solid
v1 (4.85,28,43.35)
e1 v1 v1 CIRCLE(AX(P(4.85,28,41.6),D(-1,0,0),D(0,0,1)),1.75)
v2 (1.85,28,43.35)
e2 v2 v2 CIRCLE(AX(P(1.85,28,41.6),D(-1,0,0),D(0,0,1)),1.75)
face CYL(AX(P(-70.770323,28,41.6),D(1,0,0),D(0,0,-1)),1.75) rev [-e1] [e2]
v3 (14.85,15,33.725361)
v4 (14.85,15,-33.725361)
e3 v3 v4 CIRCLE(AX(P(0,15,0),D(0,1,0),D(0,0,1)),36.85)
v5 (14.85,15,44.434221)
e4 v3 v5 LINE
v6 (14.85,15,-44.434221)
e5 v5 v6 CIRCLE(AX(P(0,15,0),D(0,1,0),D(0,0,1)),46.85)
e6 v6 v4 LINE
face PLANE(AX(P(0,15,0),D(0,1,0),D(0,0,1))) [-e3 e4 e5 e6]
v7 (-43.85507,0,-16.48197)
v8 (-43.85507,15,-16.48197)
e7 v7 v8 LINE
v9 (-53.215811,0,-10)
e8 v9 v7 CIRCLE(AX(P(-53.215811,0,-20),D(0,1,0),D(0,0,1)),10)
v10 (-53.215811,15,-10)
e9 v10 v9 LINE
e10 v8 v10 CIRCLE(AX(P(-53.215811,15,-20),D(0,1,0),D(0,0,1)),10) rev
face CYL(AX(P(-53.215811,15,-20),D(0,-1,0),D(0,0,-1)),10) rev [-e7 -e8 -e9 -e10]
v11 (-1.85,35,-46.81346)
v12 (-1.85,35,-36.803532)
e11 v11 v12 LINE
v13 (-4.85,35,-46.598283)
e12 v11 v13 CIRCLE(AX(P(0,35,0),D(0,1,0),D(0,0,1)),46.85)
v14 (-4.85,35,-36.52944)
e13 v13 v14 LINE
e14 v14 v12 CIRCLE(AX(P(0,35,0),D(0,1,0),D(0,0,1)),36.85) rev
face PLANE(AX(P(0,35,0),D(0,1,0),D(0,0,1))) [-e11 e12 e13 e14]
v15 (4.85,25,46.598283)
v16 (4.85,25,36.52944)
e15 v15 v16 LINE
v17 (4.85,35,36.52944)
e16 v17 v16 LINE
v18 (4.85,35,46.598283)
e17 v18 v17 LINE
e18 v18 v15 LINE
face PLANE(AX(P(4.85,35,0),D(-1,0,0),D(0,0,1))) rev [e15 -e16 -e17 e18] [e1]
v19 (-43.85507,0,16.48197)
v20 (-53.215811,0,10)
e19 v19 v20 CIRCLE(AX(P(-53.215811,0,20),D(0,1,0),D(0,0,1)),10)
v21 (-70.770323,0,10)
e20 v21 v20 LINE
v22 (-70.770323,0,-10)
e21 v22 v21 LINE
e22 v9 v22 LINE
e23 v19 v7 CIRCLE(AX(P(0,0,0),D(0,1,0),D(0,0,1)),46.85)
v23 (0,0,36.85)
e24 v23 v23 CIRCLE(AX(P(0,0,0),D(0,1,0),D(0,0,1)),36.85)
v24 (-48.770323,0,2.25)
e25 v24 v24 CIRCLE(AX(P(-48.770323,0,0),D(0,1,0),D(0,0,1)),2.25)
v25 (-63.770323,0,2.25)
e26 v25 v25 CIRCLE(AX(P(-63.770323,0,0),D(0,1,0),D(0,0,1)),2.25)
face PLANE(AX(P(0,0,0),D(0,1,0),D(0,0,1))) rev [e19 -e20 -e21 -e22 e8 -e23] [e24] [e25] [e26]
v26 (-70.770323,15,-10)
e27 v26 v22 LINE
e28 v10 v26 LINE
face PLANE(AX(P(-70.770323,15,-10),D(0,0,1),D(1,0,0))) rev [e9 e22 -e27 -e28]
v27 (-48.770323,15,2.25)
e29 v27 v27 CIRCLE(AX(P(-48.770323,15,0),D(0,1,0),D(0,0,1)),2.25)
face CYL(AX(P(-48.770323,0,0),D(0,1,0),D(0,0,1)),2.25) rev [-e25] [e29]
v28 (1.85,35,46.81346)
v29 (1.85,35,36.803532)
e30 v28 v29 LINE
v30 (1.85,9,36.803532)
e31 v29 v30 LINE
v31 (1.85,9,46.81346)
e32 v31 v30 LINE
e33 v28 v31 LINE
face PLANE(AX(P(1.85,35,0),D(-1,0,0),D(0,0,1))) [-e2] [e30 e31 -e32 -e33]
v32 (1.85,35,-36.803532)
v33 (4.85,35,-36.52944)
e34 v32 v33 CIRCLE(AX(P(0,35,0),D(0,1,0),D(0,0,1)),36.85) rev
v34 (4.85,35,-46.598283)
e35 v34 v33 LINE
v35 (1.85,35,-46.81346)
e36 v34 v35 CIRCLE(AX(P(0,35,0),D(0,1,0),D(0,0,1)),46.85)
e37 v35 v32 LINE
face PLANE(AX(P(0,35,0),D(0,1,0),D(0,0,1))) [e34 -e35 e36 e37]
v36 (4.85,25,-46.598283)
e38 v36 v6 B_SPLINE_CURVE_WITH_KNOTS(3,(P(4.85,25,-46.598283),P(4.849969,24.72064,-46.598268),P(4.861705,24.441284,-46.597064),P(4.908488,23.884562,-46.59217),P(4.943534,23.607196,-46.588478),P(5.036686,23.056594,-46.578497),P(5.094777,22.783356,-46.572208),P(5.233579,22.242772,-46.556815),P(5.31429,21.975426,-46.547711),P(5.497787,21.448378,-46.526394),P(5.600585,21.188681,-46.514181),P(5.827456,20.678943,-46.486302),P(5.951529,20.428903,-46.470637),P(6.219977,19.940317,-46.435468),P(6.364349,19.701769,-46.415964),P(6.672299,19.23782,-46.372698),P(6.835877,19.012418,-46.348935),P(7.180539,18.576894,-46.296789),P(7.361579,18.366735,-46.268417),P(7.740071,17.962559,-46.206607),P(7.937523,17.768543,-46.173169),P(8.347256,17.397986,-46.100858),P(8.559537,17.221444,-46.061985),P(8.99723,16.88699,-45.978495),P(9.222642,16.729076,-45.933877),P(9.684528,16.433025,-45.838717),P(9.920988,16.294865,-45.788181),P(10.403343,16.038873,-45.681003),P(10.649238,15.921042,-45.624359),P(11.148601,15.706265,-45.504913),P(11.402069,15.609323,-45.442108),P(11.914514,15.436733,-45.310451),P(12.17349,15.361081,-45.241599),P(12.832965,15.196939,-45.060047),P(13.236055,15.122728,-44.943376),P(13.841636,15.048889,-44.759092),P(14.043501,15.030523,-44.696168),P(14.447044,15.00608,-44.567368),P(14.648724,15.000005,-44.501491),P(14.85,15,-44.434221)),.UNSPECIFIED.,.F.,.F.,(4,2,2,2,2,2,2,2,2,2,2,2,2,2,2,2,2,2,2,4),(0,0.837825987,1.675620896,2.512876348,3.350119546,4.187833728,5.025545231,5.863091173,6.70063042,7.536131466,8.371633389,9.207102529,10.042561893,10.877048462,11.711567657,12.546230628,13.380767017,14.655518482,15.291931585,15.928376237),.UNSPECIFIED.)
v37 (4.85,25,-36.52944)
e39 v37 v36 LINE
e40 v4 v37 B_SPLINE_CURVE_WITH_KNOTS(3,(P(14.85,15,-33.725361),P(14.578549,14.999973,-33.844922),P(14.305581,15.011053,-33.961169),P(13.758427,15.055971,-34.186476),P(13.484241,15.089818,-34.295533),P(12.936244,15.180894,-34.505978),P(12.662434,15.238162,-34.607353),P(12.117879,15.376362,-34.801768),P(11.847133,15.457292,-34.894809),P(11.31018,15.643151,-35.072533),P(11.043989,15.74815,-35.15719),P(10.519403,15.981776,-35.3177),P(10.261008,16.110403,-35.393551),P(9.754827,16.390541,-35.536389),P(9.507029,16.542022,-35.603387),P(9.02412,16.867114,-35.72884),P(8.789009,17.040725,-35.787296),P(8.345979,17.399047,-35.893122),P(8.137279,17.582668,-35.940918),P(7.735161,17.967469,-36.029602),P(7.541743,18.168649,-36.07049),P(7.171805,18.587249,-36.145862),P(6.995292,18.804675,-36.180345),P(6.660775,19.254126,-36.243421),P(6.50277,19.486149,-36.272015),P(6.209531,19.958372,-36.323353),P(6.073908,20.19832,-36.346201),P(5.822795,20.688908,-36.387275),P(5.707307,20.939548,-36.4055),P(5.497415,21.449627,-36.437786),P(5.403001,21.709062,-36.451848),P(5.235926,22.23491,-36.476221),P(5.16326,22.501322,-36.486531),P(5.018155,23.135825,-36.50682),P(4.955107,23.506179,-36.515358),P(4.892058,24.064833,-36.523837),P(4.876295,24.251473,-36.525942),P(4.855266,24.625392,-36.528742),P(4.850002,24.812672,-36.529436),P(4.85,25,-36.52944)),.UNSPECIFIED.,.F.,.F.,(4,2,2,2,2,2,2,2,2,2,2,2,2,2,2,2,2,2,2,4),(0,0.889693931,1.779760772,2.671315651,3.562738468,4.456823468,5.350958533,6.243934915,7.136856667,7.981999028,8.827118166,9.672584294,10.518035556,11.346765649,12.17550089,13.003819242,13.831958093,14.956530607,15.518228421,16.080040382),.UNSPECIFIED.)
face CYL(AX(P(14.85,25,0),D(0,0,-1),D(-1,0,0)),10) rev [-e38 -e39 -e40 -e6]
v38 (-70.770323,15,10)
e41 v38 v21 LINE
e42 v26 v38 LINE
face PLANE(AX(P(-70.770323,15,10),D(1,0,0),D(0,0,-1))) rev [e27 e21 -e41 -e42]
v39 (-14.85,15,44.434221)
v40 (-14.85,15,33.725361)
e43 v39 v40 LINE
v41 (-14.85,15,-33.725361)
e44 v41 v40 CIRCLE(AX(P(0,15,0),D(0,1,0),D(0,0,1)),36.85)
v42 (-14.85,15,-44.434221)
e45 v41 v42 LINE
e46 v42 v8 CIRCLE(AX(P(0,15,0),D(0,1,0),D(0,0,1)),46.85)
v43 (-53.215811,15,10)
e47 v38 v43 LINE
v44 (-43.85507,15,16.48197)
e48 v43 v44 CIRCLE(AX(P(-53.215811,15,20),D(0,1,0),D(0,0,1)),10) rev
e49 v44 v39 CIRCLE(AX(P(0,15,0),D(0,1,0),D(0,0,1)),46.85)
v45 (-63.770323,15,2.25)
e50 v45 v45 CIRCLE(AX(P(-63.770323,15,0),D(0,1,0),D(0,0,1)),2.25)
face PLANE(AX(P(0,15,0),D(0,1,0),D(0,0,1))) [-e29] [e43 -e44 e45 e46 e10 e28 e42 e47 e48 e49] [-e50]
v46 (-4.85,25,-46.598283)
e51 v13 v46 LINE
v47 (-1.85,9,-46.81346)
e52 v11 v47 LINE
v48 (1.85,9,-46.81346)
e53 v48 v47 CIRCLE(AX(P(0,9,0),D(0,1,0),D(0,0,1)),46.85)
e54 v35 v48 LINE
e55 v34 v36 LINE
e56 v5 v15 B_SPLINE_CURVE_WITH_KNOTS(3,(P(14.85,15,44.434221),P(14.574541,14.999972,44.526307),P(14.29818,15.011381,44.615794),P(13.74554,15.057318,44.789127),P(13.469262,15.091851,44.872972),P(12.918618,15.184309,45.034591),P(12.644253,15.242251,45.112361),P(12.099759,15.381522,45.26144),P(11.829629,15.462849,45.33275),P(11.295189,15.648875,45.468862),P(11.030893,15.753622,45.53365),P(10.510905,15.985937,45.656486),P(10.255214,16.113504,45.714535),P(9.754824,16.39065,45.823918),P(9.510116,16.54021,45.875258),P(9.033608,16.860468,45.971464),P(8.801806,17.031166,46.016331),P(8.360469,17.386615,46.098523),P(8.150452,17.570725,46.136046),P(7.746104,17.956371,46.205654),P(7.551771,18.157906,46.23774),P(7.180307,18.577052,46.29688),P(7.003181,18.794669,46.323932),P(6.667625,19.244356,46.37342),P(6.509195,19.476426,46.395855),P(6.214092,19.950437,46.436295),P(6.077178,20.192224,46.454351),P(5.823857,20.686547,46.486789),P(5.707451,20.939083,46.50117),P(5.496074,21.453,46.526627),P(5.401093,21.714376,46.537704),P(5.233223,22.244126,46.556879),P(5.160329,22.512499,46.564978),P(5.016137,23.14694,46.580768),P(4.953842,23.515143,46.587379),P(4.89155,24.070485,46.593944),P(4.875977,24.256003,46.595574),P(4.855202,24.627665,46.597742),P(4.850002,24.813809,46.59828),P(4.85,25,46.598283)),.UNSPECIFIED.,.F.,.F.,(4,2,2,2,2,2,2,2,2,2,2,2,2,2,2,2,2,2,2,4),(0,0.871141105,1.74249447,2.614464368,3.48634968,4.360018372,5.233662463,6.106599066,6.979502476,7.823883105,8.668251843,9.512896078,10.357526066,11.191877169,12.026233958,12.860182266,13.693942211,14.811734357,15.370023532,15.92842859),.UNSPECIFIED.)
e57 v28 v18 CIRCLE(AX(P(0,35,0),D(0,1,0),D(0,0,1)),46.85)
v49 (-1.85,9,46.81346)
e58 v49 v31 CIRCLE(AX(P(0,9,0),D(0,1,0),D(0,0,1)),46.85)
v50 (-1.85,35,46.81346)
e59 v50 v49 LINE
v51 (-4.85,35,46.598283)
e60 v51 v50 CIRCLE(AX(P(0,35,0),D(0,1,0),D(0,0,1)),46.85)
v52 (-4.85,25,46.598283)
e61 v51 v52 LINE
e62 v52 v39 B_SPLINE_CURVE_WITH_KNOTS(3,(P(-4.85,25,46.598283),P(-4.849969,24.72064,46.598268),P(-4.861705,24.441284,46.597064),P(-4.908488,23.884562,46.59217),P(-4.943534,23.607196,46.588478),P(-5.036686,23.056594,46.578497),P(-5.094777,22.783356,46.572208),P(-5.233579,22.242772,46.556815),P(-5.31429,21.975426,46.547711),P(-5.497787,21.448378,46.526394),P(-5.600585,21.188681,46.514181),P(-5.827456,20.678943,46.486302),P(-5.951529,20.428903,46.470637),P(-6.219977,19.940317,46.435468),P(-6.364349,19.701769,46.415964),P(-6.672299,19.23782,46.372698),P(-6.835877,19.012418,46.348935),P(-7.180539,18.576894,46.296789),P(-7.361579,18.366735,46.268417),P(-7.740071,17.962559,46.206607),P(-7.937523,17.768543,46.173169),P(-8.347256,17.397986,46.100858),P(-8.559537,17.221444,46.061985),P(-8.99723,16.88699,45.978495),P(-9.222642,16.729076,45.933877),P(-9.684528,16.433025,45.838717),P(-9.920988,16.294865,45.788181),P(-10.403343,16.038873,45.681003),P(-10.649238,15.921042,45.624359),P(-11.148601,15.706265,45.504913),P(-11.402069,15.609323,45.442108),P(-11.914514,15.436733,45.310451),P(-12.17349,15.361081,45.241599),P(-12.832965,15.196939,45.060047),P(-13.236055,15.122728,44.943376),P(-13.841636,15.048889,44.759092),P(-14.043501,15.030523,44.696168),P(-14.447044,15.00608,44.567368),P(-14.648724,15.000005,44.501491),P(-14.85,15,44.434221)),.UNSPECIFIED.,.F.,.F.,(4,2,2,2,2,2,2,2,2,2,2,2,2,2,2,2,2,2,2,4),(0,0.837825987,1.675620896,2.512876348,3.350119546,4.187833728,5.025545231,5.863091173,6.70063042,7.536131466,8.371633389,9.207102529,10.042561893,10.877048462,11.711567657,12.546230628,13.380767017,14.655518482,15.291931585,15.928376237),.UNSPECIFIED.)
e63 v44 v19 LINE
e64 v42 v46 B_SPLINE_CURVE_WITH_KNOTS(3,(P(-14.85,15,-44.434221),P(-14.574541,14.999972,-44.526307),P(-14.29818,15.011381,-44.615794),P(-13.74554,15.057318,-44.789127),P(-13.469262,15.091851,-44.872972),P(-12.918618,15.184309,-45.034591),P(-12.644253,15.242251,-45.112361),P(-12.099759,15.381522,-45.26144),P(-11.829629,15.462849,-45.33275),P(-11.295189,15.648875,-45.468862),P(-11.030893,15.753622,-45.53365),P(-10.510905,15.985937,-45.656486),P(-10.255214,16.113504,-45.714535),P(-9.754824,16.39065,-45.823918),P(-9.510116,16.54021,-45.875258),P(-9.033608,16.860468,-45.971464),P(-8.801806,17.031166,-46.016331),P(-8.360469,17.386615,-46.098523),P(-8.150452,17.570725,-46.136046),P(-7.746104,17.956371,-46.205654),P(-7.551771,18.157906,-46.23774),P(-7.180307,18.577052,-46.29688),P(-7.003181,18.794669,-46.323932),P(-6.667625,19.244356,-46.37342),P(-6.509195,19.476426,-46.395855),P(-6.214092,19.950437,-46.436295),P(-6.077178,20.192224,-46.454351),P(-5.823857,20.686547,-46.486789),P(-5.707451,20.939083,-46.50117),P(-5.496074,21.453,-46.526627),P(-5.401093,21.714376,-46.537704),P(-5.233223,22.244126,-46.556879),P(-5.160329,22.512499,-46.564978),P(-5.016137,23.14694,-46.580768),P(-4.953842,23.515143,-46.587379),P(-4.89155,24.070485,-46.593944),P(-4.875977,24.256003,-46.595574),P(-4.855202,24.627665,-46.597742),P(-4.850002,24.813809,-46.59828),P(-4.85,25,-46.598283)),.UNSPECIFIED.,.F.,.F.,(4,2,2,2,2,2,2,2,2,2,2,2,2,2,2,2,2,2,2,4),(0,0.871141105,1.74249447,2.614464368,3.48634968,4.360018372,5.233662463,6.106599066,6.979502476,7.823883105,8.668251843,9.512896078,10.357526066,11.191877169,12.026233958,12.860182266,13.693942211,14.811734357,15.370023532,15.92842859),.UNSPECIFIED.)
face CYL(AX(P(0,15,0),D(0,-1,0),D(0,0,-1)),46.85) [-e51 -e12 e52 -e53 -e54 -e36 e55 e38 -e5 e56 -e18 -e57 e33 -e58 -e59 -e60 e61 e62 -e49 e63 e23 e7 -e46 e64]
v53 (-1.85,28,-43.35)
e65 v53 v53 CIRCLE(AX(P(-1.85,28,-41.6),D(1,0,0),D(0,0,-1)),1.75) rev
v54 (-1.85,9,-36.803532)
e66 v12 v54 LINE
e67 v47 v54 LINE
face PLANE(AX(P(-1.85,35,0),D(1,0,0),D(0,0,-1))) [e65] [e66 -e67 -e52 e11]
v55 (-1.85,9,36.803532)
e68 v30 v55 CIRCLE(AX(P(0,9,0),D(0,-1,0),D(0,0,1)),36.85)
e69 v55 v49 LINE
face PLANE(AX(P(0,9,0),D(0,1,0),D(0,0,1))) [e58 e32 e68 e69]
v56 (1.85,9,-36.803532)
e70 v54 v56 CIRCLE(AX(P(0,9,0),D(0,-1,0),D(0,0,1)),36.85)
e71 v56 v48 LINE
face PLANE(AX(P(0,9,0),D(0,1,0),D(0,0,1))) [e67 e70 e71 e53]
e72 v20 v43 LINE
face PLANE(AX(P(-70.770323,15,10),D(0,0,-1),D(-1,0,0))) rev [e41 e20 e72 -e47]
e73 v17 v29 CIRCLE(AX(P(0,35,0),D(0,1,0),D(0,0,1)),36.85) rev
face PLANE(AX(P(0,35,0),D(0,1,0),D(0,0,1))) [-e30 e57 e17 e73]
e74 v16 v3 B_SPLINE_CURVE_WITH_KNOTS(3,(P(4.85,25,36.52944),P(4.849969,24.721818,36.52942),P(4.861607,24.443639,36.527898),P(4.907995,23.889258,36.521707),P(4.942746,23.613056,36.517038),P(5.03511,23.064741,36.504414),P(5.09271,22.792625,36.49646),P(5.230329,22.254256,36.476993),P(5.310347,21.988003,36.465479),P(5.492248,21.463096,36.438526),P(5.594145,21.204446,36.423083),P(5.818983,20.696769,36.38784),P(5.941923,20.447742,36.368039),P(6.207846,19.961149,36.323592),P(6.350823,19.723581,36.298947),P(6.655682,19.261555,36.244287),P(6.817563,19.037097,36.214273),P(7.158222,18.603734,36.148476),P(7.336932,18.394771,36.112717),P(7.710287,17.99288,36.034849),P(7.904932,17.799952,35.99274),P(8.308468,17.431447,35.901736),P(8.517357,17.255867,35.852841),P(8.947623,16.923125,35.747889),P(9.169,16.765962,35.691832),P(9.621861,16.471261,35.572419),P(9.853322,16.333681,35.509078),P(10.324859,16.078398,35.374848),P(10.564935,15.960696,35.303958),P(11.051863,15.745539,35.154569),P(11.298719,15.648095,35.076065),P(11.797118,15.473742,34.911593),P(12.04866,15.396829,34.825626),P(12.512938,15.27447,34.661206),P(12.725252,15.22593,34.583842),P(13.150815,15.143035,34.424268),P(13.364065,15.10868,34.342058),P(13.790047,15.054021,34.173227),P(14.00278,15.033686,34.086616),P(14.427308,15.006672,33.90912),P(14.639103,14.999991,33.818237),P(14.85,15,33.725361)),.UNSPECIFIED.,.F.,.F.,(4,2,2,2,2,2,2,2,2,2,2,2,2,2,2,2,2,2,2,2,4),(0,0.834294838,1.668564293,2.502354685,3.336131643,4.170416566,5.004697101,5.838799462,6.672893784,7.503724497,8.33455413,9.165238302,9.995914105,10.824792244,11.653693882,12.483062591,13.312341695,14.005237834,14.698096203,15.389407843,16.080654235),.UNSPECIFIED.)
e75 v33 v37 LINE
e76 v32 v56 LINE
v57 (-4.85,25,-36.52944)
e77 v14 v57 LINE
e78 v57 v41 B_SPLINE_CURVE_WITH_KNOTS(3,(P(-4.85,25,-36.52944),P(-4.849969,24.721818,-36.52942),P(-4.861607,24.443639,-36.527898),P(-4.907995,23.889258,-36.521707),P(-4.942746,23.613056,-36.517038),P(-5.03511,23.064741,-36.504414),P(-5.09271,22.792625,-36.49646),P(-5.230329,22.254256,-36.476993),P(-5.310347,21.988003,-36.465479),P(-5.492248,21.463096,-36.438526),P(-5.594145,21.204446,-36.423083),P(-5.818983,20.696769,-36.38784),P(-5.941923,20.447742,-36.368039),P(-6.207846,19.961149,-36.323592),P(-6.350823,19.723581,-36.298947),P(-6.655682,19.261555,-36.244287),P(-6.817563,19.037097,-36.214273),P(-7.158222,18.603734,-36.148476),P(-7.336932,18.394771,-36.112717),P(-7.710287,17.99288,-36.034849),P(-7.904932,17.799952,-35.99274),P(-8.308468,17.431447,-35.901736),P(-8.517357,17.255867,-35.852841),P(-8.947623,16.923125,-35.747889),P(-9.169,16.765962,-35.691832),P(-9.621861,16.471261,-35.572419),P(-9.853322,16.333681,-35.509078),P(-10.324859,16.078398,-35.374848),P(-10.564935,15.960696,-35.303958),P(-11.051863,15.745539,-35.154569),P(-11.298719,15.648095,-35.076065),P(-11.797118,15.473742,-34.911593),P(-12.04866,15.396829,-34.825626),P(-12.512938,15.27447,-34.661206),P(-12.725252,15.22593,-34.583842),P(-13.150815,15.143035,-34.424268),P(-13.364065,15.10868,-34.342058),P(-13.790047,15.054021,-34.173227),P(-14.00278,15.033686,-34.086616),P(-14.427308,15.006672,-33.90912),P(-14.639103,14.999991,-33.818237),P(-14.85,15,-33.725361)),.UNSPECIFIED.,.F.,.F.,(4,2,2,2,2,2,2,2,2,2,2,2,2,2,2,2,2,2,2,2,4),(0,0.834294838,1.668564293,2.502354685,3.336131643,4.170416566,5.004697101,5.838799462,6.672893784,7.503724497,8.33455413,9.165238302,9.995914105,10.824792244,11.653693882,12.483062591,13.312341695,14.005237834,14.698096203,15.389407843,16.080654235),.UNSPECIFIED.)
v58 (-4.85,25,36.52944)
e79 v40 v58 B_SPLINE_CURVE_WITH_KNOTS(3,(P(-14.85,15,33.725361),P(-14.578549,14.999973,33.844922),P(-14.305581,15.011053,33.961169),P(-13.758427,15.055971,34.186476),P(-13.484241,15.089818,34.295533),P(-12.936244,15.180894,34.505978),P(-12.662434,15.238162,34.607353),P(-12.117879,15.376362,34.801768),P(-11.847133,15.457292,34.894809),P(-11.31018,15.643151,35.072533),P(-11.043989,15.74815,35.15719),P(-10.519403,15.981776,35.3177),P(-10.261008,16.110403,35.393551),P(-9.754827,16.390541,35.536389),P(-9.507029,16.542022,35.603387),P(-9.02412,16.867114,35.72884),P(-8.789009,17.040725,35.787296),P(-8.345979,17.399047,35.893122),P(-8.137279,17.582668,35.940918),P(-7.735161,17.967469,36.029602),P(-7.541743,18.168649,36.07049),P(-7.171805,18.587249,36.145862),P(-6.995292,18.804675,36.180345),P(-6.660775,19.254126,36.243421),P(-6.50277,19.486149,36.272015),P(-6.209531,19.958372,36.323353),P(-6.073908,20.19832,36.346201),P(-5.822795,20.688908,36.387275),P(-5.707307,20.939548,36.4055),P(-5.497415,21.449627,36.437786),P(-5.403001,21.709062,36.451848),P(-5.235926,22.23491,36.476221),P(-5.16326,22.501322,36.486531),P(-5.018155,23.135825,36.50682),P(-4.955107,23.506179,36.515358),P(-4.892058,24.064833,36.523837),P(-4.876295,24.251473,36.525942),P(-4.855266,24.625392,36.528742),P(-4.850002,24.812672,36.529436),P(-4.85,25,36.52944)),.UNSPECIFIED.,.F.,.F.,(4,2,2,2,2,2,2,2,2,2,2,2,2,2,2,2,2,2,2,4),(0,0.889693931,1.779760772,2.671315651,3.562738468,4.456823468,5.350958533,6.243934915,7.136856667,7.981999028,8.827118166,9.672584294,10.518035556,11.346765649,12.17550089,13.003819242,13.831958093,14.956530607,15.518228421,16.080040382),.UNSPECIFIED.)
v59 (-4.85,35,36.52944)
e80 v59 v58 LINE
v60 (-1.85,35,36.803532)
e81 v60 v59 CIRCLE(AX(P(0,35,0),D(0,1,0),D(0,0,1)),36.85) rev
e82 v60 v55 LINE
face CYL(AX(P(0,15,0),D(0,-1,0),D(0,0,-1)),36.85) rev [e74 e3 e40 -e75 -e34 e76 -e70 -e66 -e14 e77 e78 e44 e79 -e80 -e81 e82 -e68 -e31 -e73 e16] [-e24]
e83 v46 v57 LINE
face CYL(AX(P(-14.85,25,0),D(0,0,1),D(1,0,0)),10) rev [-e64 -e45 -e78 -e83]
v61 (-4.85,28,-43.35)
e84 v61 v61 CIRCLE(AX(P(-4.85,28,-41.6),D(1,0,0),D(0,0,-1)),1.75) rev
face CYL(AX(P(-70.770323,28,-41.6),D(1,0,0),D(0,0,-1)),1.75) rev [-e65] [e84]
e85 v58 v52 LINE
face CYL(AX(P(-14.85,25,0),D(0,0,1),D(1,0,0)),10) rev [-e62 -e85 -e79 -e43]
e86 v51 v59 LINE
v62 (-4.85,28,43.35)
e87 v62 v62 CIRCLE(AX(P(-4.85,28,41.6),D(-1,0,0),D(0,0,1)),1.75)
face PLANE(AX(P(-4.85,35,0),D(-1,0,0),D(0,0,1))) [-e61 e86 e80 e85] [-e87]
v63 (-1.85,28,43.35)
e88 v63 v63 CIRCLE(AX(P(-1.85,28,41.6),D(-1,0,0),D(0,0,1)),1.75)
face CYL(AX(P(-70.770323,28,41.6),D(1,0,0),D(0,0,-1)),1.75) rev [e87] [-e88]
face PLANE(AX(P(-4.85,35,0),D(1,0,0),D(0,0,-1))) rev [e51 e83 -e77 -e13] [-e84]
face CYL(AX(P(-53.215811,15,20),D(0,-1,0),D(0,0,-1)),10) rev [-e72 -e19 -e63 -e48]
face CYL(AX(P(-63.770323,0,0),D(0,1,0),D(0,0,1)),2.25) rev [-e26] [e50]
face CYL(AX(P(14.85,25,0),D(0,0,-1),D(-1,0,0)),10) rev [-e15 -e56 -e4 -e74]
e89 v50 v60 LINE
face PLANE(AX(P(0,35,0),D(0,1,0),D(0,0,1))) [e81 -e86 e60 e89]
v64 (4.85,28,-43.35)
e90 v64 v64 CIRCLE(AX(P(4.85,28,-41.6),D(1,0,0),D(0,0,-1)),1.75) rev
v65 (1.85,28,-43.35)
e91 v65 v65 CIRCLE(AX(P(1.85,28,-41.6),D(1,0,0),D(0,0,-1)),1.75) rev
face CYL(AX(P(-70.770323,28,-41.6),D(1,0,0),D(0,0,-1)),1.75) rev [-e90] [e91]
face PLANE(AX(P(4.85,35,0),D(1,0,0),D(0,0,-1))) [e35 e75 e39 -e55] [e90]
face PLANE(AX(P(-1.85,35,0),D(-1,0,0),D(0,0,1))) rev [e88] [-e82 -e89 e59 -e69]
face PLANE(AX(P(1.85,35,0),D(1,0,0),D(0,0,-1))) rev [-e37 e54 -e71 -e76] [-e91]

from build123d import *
from build123d.topology import SkipClean

# Parameters (mm, degrees)
SKETCH1_R           = 36.85
BOSS_EXTRUDE1_DEPTH = 15
SKETCH2_R           = 2.25
CUT_EXTRUDE1_DEPTH  = 87.187940965
BOSS_EXTRUDE2_DEPTH = 20
FILLET1_R           = 10
CUT_EXTRUDE2_START  = -6
CUT_EXTRUDE2_DEPTH  = 6
SKETCH5_R           = 1.75
CUT_EXTRUDE3_DEPTH  = 92.806106375
FILLET2_R           = 10


with BuildPart() as part:
    # Sketch1 → Boss-Extrude1 (new body)
    with BuildSketch(Plane(origin=(0, 0, 0), x_dir=(1, 0, 0), z_dir=(0, 1, 0))):
        with BuildLine():
            Line((-70.770323355, -10), (-45.770323355, -10))
            ThreePointArc((-45.770323355, -10), (46.85, 0), (-45.770323355, 10))
            Line((-45.770323355, 10), (-70.770323355, 10))
            Line((-70.770323355, 10), (-70.770323355, -10))
        make_face()
        with Locations(Location((0, 0, 0), (0, 0, 270))):
            Circle(SKETCH1_R, mode=Mode.SUBTRACT)
    extrude(amount=BOSS_EXTRUDE1_DEPTH)

    # Sketch2 → Cut-Extrude1 (cut, through all)
    with BuildSketch(Plane(origin=(0, 15, 0), x_dir=(1, 0, 0), z_dir=(0, 1, 0))):
        with Locations(Location((-63.770323355, 0, 0), (0, 0, 270))):
            Circle(SKETCH2_R)
        with Locations(Location((-48.770323355, 0, 0), (0, 0, 270))):
            Circle(SKETCH2_R)
    extrude(amount=-CUT_EXTRUDE1_DEPTH, mode=Mode.SUBTRACT)

    # Sketch3 → Boss-Extrude2 (add)
    with SkipClean():  # the faces are left unmerged after this step: merging them gives an invalid solid
        with BuildSketch(Plane(origin=(0, 15, 0), x_dir=(1, 0, 0), z_dir=(0, 1, 0))):
            with BuildLine():
                ThreePointArc((-1.85, -36.803532439), (-3.352802058, -36.697155453), (-4.85, -36.529440182))
                Line((-4.85, -36.529440182), (-4.85, -46.59828323))
                ThreePointArc((-4.85, -46.59828323), (-3.351727199, -46.729952116), (-1.85, -46.813459603))
                Line((-1.85, -46.813459603), (-1.85, -36.803532439))
            make_face()
            with BuildLine():
                ThreePointArc((1.85, -46.813459603), (3.351727199, -46.729952116), (4.85, -46.59828323))
                Line((4.85, -46.59828323), (4.85, -36.529440182))
                ThreePointArc((4.85, -36.529440182), (3.352802058, -36.697155453), (1.85, -36.803532439))
                Line((1.85, -36.803532439), (1.85, -46.813459603))
            make_face()
            with BuildLine():
                ThreePointArc((4.85, 46.59828323), (3.351727199, 46.729952116), (1.85, 46.813459603))
                Line((1.85, 46.813459603), (1.85, 36.803532439))
                ThreePointArc((1.85, 36.803532439), (3.352802058, 36.697155453), (4.85, 36.529440182))
                Line((4.85, 36.529440182), (4.85, 46.59828323))
            make_face()
            with BuildLine():
                Line((-1.85, 36.803532439), (-1.85, 46.813459603))
                ThreePointArc((-1.85, 46.813459603), (-3.351727199, 46.729952116), (-4.85, 46.59828323))
                Line((-4.85, 46.59828323), (-4.85, 36.529440182))
                ThreePointArc((-4.85, 36.529440182), (-3.352802058, 36.697155453), (-1.85, 36.803532439))
            make_face()
        extrude(amount=BOSS_EXTRUDE2_DEPTH)

    # Fillet1
    # the kernel refuses this fillet: 10 mm, written as the material it adds along each edge
    with BuildSketch(Plane(origin=(-4.85, 15, 11.529440182), x_dir=(-1, 0, 0), z_dir=(0, 0, 1))) as fillet1_piece_1_section:
        with BuildLine():
            CenterArc((FILLET1_R, -FILLET1_R), FILLET1_R, 90, 90)
            Line((0, -FILLET1_R), (0, 0))
            Line((0, 0), (FILLET1_R, 0))
        make_face()
    fillet1_piece_1 = extrude(amount=60.068843048, mode=Mode.PRIVATE)
    fillet1_piece_1 = fillet1_piece_1 & Plane(origin=(0, 17.250913244, 0), x_dir=(-0.9769546073589704, 0, 0.2134471718249741), z_dir=(0, -1, 0)) * Cylinder(46.85, 161, mode=Mode.PRIVATE)
    fillet1_piece_1 = fillet1_piece_1 - Plane(origin=(0, 17.250913244, 0), x_dir=(0, 0, 1), z_dir=(0, -1, 0)) * Cylinder(36.85, 161, mode=Mode.PRIVATE)
    with BuildSketch(Plane(origin=(4.85, 15, 71.59828323), x_dir=(1, 0, 0), z_dir=(0, 0, -1))) as fillet1_piece_2_section:
        with BuildLine():
            CenterArc((FILLET1_R, -FILLET1_R), FILLET1_R, 90, 90)
            Line((0, -FILLET1_R), (0, 0))
            Line((0, 0), (FILLET1_R, 0))
        make_face()
    fillet1_piece_2 = extrude(amount=60.068843048, mode=Mode.PRIVATE)
    fillet1_piece_2 = fillet1_piece_2 & Plane(origin=(0, 17.250905791, 0), x_dir=(-0.9769546073589704, 0, 0.2134471718249741), z_dir=(0, -1, 0)) * Cylinder(46.85, 161, mode=Mode.PRIVATE)
    fillet1_piece_2 = fillet1_piece_2 - Plane(origin=(0, 17.250905791, 0), x_dir=(0, 0, 1), z_dir=(0, -1, 0)) * Cylinder(36.85, 161, mode=Mode.PRIVATE)
    with BuildSketch(Plane(origin=(4.85, 15, -11.529440182), x_dir=(1, 0, 0), z_dir=(0, 0, -1))) as fillet1_piece_3_section:
        with BuildLine():
            CenterArc((FILLET1_R, -FILLET1_R), FILLET1_R, 90, 90)
            Line((0, -FILLET1_R), (0, 0))
            Line((0, 0), (FILLET1_R, 0))
        make_face()
    fillet1_piece_3 = extrude(amount=60.068843048, mode=Mode.PRIVATE)
    fillet1_piece_3 = fillet1_piece_3 & Plane(origin=(0, 17.250913244, 0), x_dir=(-0.9769546073589704, 0, 0.2134471718249741), z_dir=(0, -1, 0)) * Cylinder(46.85, 161, mode=Mode.PRIVATE)
    fillet1_piece_3 = fillet1_piece_3 - Plane(origin=(0, 17.250913244, 0), x_dir=(0, 0, 1), z_dir=(0, -1, 0)) * Cylinder(36.85, 161, mode=Mode.PRIVATE)
    with BuildSketch(Plane(origin=(-4.85, 15, -71.59828323), x_dir=(-1, 0, 0), z_dir=(0, 0, 1))) as fillet1_piece_4_section:
        with BuildLine():
            CenterArc((FILLET1_R, -FILLET1_R), FILLET1_R, 90, 90)
            Line((0, -FILLET1_R), (0, 0))
            Line((0, 0), (FILLET1_R, 0))
        make_face()
    fillet1_piece_4 = extrude(amount=60.068843048, mode=Mode.PRIVATE)
    fillet1_piece_4 = fillet1_piece_4 & Plane(origin=(0, 17.250905791, 0), x_dir=(-0.9769546073589704, 0, 0.2134471718249741), z_dir=(0, -1, 0)) * Cylinder(46.85, 161, mode=Mode.PRIVATE)
    fillet1_piece_4 = fillet1_piece_4 - Plane(origin=(0, 17.250905791, 0), x_dir=(0, 0, 1), z_dir=(0, -1, 0)) * Cylinder(36.85, 161, mode=Mode.PRIVATE)
    add([fillet1_piece_1, fillet1_piece_2, fillet1_piece_3, fillet1_piece_4])

    # Sketch4 → Cut-Extrude2 (cut)
    with BuildSketch(Plane(origin=(0, 15, 0), x_dir=(1, 0, 0), z_dir=(0, 1, 0)).offset(CUT_EXTRUDE2_START)):
        with BuildLine():
            Line((-1.85, 46.813459603), (-1.85, 36.803532439))
            ThreePointArc((-1.85, 36.803532439), (0, 36.85), (1.85, 36.803532439))
            Line((1.85, 36.803532439), (1.85, 46.813459603))
            ThreePointArc((1.85, 46.813459603), (0, 46.85), (-1.85, 46.813459603))
        make_face()
        with BuildLine():
            Line((1.85, -46.813459603), (1.85, -36.803532439))
            ThreePointArc((1.85, -36.803532439), (0, -36.85), (-1.85, -36.803532439))
            Line((-1.85, -36.803532439), (-1.85, -46.813459603))
            ThreePointArc((-1.85, -46.813459603), (0, -46.85), (1.85, -46.813459603))
        make_face()
    extrude(amount=CUT_EXTRUDE2_DEPTH, mode=Mode.SUBTRACT)

    # Sketch5 → Cut-Extrude3 (cut, symmetric)
    with BuildSketch(Plane(origin=(0, 0, 0), x_dir=(0, 0, -1), z_dir=(1, 0, 0))):
        with Locations(Location((-41.6, 28, 0), (0, 0, 180))):
            Circle(SKETCH5_R)
    cut_extrude3 = extrude(amount=CUT_EXTRUDE3_DEPTH, both=True, mode=Mode.SUBTRACT)

    # Fillet2
    fillet2_edges = [part.edges().sort_by_distance(p)[0] for p in [
        (-45.770323355, 7.5, 10),
        (-45.770323355, 7.5, -10),
    ]]
    fillet(fillet2_edges, radius=FILLET2_R)

    # Mirror1: Cut-Extrude3 across plane
    add(cut_extrude3.mirror(Plane.XY), mode=Mode.SUBTRACT)


solid = part.part
